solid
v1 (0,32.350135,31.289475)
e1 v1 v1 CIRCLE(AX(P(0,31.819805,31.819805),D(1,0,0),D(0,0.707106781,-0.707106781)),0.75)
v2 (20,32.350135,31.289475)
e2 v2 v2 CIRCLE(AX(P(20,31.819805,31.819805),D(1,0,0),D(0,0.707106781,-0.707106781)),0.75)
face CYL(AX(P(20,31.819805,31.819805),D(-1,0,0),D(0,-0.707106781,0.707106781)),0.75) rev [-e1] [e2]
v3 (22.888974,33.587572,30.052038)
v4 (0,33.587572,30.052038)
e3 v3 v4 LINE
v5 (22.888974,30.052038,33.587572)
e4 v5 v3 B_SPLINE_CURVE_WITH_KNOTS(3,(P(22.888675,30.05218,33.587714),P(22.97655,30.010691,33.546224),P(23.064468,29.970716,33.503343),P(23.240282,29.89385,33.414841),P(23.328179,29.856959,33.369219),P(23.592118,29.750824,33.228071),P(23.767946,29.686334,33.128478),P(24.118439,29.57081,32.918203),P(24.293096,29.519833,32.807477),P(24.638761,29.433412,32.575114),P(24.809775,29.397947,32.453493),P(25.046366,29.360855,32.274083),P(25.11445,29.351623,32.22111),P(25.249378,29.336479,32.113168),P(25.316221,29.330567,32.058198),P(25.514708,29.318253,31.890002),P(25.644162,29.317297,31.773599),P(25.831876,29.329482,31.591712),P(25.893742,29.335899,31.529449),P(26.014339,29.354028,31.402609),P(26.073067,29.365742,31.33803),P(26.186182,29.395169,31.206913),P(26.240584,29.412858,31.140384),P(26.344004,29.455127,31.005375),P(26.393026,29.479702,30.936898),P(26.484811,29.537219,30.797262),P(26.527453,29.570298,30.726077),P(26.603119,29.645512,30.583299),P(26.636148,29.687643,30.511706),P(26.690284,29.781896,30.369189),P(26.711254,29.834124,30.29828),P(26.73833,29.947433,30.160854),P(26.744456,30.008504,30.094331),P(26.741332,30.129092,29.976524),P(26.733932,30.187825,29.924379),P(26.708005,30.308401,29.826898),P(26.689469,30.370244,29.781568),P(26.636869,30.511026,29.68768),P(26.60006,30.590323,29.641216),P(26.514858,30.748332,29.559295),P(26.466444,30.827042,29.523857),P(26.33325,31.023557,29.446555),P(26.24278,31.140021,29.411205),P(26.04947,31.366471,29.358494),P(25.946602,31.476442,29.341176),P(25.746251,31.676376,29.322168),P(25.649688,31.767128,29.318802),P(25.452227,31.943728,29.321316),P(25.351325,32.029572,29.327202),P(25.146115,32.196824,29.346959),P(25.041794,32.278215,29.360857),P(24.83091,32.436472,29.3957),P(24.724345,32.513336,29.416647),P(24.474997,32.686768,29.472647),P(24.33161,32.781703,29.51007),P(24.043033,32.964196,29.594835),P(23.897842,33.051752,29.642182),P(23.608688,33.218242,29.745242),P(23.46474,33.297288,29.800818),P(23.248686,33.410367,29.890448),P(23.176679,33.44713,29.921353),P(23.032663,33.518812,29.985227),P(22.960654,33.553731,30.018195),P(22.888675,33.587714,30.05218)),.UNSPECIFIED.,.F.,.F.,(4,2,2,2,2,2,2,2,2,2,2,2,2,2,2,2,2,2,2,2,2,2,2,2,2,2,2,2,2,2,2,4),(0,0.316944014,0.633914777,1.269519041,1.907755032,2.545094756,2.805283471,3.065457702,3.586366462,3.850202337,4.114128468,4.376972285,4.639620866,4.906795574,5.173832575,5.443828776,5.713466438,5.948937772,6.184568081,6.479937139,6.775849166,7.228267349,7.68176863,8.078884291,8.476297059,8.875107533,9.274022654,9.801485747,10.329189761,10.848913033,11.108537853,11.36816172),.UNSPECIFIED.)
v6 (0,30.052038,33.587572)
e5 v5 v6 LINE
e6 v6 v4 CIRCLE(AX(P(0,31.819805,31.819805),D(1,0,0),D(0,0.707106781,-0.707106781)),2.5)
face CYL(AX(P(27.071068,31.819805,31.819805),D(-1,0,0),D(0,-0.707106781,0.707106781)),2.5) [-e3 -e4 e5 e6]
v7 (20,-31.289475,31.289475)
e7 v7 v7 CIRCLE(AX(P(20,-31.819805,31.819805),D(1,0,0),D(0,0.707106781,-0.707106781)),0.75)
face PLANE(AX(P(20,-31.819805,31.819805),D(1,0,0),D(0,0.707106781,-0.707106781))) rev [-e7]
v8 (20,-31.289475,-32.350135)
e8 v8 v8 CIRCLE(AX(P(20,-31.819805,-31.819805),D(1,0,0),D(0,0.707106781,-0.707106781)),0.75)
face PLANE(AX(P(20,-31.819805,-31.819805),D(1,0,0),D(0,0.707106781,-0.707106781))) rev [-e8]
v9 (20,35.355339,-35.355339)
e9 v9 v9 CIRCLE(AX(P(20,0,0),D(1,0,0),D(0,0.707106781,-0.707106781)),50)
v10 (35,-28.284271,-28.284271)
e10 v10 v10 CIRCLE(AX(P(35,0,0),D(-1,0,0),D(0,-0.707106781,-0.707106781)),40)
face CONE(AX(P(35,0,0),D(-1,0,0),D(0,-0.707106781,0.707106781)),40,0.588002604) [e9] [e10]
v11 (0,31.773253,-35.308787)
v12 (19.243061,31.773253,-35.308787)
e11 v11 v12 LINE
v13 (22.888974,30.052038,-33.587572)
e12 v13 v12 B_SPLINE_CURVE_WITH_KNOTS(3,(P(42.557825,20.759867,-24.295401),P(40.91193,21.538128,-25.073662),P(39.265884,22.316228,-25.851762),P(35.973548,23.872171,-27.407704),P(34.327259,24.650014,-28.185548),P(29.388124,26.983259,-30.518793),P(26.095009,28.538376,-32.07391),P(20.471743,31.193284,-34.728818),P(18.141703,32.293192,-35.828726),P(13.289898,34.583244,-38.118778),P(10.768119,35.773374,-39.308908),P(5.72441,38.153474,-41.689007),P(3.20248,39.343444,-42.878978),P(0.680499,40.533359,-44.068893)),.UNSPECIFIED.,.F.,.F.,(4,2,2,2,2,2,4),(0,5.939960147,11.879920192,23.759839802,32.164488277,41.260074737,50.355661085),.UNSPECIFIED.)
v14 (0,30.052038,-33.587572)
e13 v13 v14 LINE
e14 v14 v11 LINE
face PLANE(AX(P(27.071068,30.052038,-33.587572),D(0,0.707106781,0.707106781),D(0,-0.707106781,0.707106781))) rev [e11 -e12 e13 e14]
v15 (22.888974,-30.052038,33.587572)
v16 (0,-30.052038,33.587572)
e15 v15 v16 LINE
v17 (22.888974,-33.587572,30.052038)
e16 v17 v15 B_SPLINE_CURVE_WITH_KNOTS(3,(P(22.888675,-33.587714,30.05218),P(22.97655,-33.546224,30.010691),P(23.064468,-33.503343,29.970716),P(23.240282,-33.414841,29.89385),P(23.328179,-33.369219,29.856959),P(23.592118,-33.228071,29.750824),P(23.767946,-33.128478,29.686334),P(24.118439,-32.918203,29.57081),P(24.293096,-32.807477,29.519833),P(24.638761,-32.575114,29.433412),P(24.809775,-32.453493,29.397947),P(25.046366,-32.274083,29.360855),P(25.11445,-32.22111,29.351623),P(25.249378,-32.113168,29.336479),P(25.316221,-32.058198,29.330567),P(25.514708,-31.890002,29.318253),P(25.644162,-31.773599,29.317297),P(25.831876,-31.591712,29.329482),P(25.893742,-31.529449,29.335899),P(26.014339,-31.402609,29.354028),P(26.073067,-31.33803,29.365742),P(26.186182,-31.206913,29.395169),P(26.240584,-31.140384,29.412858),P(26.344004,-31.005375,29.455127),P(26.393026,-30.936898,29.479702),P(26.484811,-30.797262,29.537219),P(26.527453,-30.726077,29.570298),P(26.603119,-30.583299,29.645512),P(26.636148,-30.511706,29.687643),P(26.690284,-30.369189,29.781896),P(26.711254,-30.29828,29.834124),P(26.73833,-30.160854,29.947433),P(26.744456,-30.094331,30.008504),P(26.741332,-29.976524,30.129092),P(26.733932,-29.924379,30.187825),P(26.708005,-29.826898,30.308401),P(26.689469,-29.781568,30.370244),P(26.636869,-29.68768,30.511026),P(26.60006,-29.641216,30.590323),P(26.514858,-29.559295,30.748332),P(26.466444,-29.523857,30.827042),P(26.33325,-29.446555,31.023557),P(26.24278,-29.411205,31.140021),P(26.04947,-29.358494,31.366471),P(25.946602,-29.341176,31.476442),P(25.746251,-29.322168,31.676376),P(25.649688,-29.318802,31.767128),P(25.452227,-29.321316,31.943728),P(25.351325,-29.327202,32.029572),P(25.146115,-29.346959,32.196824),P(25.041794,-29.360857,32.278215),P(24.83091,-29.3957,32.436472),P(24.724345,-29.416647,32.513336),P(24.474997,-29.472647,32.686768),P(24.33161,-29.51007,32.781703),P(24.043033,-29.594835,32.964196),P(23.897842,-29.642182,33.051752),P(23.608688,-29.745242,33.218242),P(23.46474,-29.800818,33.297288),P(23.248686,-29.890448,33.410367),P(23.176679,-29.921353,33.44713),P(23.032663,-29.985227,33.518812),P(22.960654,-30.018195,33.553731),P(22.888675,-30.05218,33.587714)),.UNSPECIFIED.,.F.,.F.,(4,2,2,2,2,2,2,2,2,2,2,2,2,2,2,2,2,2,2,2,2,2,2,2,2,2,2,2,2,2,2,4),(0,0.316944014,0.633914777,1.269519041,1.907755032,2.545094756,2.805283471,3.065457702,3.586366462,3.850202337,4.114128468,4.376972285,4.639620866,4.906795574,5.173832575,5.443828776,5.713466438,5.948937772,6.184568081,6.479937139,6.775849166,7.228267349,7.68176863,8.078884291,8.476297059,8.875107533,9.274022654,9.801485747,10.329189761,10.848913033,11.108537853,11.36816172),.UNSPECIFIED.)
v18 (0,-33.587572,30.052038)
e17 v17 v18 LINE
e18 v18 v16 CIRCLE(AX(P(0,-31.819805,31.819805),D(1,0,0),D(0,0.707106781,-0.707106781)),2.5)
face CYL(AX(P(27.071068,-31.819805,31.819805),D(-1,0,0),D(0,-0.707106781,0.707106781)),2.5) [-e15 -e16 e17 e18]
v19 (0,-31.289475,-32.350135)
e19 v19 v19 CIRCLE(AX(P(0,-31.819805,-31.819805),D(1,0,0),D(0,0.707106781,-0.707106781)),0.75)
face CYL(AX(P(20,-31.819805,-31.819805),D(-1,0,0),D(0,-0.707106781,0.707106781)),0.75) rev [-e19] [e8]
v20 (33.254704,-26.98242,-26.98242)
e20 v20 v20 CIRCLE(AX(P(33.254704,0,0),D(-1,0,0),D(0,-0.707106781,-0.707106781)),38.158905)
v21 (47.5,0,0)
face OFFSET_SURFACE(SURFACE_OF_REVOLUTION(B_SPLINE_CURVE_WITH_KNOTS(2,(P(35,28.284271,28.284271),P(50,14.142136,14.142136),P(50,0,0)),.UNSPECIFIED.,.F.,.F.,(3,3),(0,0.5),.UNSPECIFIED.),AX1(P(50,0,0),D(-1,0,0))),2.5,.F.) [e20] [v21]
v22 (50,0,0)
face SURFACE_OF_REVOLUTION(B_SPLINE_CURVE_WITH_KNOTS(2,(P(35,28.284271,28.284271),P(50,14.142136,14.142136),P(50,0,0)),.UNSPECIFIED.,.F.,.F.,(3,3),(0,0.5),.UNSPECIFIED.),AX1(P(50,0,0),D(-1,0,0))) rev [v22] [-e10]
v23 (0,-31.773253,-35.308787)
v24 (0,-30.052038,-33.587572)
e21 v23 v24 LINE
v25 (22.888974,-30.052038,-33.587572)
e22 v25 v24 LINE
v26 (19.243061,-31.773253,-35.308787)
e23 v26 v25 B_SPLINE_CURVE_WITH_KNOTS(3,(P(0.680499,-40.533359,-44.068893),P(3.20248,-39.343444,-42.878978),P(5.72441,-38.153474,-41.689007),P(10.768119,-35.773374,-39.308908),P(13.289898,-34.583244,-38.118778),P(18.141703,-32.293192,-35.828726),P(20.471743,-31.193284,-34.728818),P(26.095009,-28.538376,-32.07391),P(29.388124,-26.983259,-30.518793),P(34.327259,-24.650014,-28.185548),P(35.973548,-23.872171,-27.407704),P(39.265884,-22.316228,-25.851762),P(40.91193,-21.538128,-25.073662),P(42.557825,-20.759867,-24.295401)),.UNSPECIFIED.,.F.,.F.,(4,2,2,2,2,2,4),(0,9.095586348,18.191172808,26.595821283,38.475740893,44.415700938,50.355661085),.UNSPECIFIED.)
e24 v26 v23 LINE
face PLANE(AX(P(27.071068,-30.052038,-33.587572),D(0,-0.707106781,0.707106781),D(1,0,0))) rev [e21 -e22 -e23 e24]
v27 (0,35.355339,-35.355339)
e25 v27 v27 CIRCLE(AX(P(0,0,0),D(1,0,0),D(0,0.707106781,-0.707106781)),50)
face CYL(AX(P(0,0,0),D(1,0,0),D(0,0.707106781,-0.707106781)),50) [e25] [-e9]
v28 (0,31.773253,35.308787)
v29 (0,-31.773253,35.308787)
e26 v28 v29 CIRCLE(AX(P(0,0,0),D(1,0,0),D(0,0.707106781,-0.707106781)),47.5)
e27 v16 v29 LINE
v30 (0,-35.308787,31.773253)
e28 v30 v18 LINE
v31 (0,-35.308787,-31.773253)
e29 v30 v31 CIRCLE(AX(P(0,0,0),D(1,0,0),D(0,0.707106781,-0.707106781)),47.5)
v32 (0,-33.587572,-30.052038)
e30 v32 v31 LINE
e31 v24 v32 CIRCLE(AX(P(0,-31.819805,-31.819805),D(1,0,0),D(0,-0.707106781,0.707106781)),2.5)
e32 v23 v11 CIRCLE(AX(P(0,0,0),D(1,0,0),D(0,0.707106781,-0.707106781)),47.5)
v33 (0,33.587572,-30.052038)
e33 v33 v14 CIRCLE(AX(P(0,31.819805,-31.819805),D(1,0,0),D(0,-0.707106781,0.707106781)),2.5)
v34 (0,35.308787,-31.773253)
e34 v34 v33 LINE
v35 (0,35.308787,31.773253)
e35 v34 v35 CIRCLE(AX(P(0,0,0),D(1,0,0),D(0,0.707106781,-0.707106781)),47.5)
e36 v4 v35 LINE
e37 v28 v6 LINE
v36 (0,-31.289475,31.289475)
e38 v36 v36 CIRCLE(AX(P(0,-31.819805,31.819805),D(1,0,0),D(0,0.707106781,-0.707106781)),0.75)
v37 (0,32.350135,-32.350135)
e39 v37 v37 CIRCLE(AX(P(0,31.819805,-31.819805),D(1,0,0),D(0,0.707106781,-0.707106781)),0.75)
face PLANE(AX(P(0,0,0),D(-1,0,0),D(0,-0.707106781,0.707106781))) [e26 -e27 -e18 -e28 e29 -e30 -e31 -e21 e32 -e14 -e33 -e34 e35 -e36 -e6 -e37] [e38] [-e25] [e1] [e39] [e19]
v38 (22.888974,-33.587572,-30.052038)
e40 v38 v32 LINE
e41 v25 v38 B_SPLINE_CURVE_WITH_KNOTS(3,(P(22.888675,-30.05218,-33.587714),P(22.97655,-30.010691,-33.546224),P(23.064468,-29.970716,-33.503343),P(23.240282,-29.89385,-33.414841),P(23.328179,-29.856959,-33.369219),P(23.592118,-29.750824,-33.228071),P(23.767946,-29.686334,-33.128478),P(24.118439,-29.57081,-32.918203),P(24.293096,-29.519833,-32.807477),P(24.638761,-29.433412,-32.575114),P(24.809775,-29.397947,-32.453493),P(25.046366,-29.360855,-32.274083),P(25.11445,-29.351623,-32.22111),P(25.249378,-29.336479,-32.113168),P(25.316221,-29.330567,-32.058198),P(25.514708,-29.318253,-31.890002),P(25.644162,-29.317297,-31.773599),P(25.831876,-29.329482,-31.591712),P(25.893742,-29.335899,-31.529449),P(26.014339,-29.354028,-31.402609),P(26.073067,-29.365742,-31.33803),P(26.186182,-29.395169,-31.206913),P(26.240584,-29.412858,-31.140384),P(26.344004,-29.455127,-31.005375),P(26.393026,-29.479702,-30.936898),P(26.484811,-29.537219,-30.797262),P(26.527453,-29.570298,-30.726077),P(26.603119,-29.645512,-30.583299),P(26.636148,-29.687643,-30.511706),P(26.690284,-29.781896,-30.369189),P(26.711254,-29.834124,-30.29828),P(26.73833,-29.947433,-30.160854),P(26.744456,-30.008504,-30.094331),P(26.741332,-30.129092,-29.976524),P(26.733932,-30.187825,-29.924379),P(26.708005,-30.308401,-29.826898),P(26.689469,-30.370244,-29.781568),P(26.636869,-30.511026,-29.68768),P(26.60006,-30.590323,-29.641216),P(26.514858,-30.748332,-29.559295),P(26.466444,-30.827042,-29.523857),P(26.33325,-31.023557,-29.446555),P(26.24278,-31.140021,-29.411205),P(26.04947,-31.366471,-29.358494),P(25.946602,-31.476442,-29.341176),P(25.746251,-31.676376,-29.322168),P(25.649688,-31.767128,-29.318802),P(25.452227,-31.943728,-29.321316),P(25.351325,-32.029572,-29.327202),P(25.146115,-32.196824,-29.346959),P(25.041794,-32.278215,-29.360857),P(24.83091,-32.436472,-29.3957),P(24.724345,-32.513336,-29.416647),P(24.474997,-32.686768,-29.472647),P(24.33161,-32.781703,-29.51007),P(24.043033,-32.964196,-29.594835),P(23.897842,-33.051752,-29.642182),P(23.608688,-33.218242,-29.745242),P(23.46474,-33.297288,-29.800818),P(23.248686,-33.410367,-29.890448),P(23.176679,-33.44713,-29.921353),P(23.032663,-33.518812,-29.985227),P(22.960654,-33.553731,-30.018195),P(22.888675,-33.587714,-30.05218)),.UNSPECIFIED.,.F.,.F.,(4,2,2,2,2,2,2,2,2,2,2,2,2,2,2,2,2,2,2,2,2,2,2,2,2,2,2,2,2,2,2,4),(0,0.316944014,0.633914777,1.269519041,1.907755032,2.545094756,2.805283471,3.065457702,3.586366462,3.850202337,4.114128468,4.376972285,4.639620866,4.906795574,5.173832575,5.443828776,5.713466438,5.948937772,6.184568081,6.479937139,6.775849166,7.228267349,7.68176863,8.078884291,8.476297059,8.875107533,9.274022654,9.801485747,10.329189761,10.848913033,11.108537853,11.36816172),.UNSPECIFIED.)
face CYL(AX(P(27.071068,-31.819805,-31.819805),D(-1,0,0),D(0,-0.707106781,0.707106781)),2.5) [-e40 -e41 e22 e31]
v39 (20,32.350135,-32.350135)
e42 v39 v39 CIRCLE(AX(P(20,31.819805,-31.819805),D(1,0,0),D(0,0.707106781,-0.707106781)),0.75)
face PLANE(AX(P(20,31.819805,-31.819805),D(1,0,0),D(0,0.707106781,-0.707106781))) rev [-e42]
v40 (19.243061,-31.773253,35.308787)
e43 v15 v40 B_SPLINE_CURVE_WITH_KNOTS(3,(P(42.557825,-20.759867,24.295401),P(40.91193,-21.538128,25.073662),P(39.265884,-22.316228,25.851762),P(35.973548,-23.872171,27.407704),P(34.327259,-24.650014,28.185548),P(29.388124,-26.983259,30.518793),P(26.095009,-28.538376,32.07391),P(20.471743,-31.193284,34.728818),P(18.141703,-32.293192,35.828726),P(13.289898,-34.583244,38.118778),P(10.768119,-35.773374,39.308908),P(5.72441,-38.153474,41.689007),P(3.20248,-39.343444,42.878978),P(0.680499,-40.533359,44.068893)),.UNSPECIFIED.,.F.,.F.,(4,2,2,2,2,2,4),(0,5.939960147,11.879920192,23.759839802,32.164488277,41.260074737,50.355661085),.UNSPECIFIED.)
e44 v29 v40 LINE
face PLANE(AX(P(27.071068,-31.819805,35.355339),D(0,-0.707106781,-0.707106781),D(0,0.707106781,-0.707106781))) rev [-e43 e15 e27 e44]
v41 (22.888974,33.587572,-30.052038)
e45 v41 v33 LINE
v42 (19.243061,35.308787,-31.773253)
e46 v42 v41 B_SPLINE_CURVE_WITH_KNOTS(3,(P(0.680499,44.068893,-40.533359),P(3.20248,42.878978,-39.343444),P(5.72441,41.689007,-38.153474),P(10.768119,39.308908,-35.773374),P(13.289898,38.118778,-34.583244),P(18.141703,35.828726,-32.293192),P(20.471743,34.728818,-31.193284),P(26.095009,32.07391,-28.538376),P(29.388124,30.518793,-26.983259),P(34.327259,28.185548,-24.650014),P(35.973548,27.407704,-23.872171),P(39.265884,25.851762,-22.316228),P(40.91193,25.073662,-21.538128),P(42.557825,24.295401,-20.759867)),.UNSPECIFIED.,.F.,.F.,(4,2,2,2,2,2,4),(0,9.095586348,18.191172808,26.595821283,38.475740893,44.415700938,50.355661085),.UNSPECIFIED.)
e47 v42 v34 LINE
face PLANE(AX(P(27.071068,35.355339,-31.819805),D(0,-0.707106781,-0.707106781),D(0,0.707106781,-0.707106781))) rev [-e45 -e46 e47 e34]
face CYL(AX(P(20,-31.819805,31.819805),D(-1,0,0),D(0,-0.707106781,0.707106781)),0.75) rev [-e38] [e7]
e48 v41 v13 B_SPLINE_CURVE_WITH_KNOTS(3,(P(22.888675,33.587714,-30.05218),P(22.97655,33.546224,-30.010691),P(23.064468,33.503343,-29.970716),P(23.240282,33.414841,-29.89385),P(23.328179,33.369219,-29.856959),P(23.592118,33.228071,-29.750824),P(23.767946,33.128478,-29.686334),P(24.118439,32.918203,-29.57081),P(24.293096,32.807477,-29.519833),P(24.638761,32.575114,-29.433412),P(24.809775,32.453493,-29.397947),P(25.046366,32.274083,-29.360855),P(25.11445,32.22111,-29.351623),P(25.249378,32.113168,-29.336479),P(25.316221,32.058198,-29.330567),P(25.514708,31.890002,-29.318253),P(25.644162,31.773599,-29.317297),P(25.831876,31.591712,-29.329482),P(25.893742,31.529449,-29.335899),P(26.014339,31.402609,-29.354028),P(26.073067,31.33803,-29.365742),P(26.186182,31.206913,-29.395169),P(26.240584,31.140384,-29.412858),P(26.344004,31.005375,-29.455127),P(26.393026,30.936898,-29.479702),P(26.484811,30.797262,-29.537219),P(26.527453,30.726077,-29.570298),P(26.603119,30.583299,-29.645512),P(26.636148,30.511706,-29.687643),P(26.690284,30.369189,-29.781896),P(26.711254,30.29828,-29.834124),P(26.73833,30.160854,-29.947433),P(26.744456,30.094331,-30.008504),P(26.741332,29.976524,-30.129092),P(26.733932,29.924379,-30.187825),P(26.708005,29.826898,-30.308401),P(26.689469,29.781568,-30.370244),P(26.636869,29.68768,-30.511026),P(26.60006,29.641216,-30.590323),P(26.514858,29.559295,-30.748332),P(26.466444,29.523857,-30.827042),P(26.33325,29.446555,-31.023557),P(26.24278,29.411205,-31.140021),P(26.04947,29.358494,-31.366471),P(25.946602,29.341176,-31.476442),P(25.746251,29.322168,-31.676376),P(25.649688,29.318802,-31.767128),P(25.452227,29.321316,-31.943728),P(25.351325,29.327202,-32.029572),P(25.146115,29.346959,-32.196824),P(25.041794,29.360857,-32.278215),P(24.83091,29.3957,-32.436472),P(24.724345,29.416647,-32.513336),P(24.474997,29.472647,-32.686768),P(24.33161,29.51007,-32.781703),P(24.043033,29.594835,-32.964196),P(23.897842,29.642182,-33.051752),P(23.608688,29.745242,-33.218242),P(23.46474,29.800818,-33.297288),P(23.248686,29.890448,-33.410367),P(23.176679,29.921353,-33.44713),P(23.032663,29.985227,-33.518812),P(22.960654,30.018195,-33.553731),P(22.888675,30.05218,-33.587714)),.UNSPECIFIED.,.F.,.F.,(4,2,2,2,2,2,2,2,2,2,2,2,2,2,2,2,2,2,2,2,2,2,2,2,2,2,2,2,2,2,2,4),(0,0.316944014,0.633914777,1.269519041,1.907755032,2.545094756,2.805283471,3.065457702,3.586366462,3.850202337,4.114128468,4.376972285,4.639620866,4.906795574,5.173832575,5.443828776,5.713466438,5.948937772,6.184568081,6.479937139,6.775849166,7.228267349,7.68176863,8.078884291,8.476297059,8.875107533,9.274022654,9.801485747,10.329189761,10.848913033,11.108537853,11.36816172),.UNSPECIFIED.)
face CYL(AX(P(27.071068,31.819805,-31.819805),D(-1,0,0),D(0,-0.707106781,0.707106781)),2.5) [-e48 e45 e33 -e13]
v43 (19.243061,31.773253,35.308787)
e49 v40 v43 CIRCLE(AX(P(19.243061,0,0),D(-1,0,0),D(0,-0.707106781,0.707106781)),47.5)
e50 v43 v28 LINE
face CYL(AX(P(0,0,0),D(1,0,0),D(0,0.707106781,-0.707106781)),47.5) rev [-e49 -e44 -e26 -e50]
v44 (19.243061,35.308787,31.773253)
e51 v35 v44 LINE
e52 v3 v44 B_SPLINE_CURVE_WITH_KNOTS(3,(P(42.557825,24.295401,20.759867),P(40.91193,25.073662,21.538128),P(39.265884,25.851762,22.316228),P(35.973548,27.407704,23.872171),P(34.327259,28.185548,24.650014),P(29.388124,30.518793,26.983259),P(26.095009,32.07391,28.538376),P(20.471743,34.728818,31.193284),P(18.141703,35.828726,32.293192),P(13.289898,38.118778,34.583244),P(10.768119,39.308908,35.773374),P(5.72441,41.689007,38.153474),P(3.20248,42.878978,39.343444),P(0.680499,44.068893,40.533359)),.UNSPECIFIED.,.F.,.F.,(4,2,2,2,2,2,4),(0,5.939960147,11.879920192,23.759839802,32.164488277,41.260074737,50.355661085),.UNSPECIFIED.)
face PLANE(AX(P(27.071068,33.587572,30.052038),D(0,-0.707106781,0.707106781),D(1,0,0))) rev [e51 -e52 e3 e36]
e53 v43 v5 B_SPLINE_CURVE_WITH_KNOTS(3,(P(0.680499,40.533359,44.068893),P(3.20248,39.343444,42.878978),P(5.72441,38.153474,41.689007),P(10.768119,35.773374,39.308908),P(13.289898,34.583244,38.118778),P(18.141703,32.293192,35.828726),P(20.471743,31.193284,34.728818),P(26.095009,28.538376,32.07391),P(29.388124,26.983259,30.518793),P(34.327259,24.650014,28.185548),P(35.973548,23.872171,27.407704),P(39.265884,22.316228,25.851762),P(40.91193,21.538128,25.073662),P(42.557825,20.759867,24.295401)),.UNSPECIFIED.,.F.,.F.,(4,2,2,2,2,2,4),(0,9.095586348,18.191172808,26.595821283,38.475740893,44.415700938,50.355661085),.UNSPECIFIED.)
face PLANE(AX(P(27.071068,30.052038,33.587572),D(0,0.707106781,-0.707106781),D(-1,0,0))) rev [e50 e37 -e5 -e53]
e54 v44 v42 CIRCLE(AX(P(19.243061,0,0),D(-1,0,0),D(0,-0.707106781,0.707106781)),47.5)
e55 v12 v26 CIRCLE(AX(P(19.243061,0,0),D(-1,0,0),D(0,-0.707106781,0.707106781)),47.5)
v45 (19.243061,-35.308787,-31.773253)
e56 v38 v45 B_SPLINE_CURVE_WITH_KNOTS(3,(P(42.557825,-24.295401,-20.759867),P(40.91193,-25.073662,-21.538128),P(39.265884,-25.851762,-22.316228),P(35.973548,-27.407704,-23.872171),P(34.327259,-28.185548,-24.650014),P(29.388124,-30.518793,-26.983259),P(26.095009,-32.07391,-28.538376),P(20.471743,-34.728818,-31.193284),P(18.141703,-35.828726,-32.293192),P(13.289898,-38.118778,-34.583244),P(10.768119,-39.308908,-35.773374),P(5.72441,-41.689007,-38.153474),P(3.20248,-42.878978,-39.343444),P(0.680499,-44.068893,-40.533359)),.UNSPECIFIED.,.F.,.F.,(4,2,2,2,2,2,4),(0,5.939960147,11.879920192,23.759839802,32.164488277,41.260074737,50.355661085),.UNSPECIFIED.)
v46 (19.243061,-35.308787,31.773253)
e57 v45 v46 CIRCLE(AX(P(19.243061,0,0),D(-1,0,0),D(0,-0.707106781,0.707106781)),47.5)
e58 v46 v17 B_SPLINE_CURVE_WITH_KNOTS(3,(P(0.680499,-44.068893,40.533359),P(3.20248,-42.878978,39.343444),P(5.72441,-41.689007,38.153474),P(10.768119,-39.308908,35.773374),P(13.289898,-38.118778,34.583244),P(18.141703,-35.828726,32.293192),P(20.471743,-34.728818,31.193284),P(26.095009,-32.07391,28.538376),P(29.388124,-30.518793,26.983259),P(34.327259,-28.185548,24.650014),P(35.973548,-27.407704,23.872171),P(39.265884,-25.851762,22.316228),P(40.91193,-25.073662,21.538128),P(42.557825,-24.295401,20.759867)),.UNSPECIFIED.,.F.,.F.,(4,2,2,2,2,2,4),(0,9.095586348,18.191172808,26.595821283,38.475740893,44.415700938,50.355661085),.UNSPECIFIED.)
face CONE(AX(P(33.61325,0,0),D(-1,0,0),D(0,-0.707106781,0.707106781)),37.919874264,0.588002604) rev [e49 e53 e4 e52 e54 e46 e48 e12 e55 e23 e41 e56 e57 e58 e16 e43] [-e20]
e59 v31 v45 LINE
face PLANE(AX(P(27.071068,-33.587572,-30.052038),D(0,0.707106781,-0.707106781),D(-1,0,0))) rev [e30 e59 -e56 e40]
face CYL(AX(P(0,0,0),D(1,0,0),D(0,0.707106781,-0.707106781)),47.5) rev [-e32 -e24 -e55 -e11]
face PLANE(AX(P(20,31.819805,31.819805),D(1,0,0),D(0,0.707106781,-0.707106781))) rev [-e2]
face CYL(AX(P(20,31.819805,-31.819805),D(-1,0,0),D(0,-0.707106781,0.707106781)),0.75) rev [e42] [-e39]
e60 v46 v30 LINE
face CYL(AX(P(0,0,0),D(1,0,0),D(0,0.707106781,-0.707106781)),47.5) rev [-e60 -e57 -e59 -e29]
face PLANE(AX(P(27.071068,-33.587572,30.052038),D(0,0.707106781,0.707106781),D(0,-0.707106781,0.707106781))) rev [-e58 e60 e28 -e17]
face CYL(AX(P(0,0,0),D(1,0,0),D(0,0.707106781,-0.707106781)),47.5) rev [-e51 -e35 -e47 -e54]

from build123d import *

# Parameters (mm, degrees)
SURFACE_EXTRUDE3_1_DEPTH = 20
THICKEN6_T1              = 2.5
BOSS_EXTRUDE2_DEPTH      = 20
SKETCH6_R                = 0.75
CUT_EXTRUDE1_DEPTH       = 74.484692283
BOSS_EXTRUDE4_REACH      = 75.485
THICKEN8_T1              = 2.5
BODY_MOVE_COPY1_ANGLE    = 45


# Read off the part's stored shape, not the designer's step: Thicken7
with BuildPart() as body_1:
    # Surface-Extrude3: a surface, the sketch's curves swept straight by 20 mm
    with BuildLine(Plane(origin=(0, 0, 0), x_dir=(0, 0, -1), z_dir=(1, 0, 0)), mode=Mode.PRIVATE) as surface_extrude3_1_path:
        CenterArc((0, 0), 50, 0, 360)
    surface_extrude3_1 = Shell.extrude(surface_extrude3_1_path.wire(), (1 * SURFACE_EXTRUDE3_1_DEPTH, 0 * SURFACE_EXTRUDE3_1_DEPTH, 0 * SURFACE_EXTRUDE3_1_DEPTH))
    add(Solid.thicken(surface_extrude3_1, THICKEN6_T1))

    # Sketch5 → Boss-Extrude2 (add)
    with BuildSketch(Plane(origin=(0, 0, 0), x_dir=(0, 0, -1), z_dir=(1, 0, 0))):
        with BuildLine():
            Line((2.5, 45), (2.5, 47.5))
            Line((2.5, 47.5), (-2.5, 47.5))
            Line((-2.5, 47.5), (-2.5, 45))
            ThreePointArc((-2.5, 45), (0, 42.5), (2.5, 45))
        make_face()
        with BuildLine():
            Line((-45, -2.5), (-47.5, -2.5))
            Line((-47.5, -2.5), (-47.5, 2.5))
            Line((-47.5, 2.5), (-45, 2.5))
            ThreePointArc((-45, 2.5), (-42.5, 0), (-45, -2.5))
        make_face()
        with BuildLine():
            Line((47.5, 2.5), (45, 2.5))
            ThreePointArc((45, 2.5), (42.5, 0), (45, -2.5))
            Line((45, -2.5), (47.5, -2.5))
            Line((47.5, -2.5), (47.5, 2.5))
        make_face()
        with BuildLine():
            Line((-2.5, -47.5), (2.5, -47.5))
            Line((2.5, -47.5), (2.5, -45))
            ThreePointArc((2.5, -45), (0, -42.5), (-2.5, -45))
            Line((-2.5, -45), (-2.5, -47.5))
        make_face()
    extrude(amount=BOSS_EXTRUDE2_DEPTH)

    # Sketch6 → Cut-Extrude1 (cut, through all)
    with BuildSketch(Plane(origin=(0, 0, 0), x_dir=(0, 0, -1), z_dir=(1, 0, 0))):
        with Locations((0, 45)):
            Circle(SKETCH6_R)
        with Locations((45, 0)):
            Circle(SKETCH6_R)
        with Locations((0, -45)):
            Circle(SKETCH6_R)
        with Locations((-45, 0)):
            Circle(SKETCH6_R)
    extrude(amount=CUT_EXTRUDE1_DEPTH, mode=Mode.SUBTRACT)

    # Thicken7 outline → Thicken7 (revolve)
    with BuildSketch(Plane.YX):
        Polygon((40, 35), (37.919874264, 33.613249509), (47.5, 19.243060906), (47.5, 20), (50, 20), align=None)
    revolve(axis=Axis((0, 0, 0), (1, 0, 0)))

    # Sketch10 → Boss-Extrude4 (add, up to next)
    with BuildSketch(Plane(origin=(20, 0, 0), x_dir=(0, 0, -1), z_dir=(1, 0, 0)), mode=Mode.PRIVATE) as boss_extrude4_sk1:
        with BuildLine():
            Line((-45, 2.5), (-46.92883092, 2.5))
            ThreePointArc((-46.92883092, 2.5), (-46.995373937, 0), (-46.92883092, -2.5))
            Line((-46.92883092, -2.5), (-45, -2.5))
            ThreePointArc((-45, -2.5), (-42.5, 0), (-45, 2.5))
        make_face()
    boss_extrude4_tool1 = extrude(boss_extrude4_sk1.sketch, amount=BOSS_EXTRUDE4_REACH, mode=Mode.PRIVATE) - body_1.part
    # Sketch10 → Boss-Extrude4 (add, up to next)
    with BuildSketch(Plane(origin=(20, 0, 0), x_dir=(0, 0, -1), z_dir=(1, 0, 0)), mode=Mode.PRIVATE) as boss_extrude4_sk2:
        with BuildLine():
            Line((-2.5, -45), (-2.5, -46.92883092))
            ThreePointArc((-2.5, -46.92883092), (0, -46.995373937), (2.5, -46.92883092))
            Line((2.5, -46.92883092), (2.5, -45))
            ThreePointArc((2.5, -45), (0, -42.5), (-2.5, -45))
        make_face()
    boss_extrude4_tool2 = extrude(boss_extrude4_sk2.sketch, amount=BOSS_EXTRUDE4_REACH, mode=Mode.PRIVATE) - body_1.part
    # Sketch10 → Boss-Extrude4 (add, up to next)
    with BuildSketch(Plane(origin=(20, 0, 0), x_dir=(0, 0, -1), z_dir=(1, 0, 0)), mode=Mode.PRIVATE) as boss_extrude4_sk3:
        with BuildLine():
            Line((45, -2.5), (46.92883092, -2.5))
            ThreePointArc((46.92883092, -2.5), (46.995373937, 0), (46.92883092, 2.5))
            Line((46.92883092, 2.5), (45, 2.5))
            ThreePointArc((45, 2.5), (42.5, 0), (45, -2.5))
        make_face()
    boss_extrude4_tool3 = extrude(boss_extrude4_sk3.sketch, amount=BOSS_EXTRUDE4_REACH, mode=Mode.PRIVATE) - body_1.part
    # Sketch10 → Boss-Extrude4 (add, up to next)
    with BuildSketch(Plane(origin=(20, 0, 0), x_dir=(0, 0, -1), z_dir=(1, 0, 0)), mode=Mode.PRIVATE) as boss_extrude4_sk4:
        with BuildLine():
            Line((2.5, 45), (2.5, 46.92883092))
            ThreePointArc((2.5, 46.92883092), (0, 46.995373937), (-2.5, 46.92883092))
            Line((-2.5, 46.92883092), (-2.5, 45))
            ThreePointArc((-2.5, 45), (0, 42.5), (2.5, 45))
        make_face()
    boss_extrude4_tool4 = extrude(boss_extrude4_sk4.sketch, amount=BOSS_EXTRUDE4_REACH, mode=Mode.PRIVATE) - body_1.part
    add(boss_extrude4_tool1.solids().sort_by_distance((20, 0, 44.965357))[0])
    add(boss_extrude4_tool2.solids().sort_by_distance((20, -44.965357, 0))[0])
    add(boss_extrude4_tool3.solids().sort_by_distance((20, 0, -44.965357))[0])
    add(boss_extrude4_tool4.solids().sort_by_distance((20, 44.965357, 0))[0])

    # Surface-Revolve3: a surface, the sketch's curves turned about an axis
    with BuildLine(Plane.XY, mode=Mode.PRIVATE) as surface_revolve3_2_path:
        add(Edge.make_bspline(
            [(35, 40), (50, 20), (50, 0)],
            knots=[0, 0, 0, 0.5, 0.5, 0.5], degree=2))
    surface_revolve3_2 = Shell.revolve(surface_revolve3_2_path.wire(), 360, Axis((50, 0, 0), (-1, 0, 0)))
    add(Solid.thicken(surface_revolve3_2, THICKEN8_T1))


with BuildPart() as body_1_1:
    # Body-Move/Copy1: moved
    add(body_1.part.rotate(Axis((0, 0, 0), (1, 0, 0)), BODY_MOVE_COPY1_ANGLE))


solid = body_1_1.part
